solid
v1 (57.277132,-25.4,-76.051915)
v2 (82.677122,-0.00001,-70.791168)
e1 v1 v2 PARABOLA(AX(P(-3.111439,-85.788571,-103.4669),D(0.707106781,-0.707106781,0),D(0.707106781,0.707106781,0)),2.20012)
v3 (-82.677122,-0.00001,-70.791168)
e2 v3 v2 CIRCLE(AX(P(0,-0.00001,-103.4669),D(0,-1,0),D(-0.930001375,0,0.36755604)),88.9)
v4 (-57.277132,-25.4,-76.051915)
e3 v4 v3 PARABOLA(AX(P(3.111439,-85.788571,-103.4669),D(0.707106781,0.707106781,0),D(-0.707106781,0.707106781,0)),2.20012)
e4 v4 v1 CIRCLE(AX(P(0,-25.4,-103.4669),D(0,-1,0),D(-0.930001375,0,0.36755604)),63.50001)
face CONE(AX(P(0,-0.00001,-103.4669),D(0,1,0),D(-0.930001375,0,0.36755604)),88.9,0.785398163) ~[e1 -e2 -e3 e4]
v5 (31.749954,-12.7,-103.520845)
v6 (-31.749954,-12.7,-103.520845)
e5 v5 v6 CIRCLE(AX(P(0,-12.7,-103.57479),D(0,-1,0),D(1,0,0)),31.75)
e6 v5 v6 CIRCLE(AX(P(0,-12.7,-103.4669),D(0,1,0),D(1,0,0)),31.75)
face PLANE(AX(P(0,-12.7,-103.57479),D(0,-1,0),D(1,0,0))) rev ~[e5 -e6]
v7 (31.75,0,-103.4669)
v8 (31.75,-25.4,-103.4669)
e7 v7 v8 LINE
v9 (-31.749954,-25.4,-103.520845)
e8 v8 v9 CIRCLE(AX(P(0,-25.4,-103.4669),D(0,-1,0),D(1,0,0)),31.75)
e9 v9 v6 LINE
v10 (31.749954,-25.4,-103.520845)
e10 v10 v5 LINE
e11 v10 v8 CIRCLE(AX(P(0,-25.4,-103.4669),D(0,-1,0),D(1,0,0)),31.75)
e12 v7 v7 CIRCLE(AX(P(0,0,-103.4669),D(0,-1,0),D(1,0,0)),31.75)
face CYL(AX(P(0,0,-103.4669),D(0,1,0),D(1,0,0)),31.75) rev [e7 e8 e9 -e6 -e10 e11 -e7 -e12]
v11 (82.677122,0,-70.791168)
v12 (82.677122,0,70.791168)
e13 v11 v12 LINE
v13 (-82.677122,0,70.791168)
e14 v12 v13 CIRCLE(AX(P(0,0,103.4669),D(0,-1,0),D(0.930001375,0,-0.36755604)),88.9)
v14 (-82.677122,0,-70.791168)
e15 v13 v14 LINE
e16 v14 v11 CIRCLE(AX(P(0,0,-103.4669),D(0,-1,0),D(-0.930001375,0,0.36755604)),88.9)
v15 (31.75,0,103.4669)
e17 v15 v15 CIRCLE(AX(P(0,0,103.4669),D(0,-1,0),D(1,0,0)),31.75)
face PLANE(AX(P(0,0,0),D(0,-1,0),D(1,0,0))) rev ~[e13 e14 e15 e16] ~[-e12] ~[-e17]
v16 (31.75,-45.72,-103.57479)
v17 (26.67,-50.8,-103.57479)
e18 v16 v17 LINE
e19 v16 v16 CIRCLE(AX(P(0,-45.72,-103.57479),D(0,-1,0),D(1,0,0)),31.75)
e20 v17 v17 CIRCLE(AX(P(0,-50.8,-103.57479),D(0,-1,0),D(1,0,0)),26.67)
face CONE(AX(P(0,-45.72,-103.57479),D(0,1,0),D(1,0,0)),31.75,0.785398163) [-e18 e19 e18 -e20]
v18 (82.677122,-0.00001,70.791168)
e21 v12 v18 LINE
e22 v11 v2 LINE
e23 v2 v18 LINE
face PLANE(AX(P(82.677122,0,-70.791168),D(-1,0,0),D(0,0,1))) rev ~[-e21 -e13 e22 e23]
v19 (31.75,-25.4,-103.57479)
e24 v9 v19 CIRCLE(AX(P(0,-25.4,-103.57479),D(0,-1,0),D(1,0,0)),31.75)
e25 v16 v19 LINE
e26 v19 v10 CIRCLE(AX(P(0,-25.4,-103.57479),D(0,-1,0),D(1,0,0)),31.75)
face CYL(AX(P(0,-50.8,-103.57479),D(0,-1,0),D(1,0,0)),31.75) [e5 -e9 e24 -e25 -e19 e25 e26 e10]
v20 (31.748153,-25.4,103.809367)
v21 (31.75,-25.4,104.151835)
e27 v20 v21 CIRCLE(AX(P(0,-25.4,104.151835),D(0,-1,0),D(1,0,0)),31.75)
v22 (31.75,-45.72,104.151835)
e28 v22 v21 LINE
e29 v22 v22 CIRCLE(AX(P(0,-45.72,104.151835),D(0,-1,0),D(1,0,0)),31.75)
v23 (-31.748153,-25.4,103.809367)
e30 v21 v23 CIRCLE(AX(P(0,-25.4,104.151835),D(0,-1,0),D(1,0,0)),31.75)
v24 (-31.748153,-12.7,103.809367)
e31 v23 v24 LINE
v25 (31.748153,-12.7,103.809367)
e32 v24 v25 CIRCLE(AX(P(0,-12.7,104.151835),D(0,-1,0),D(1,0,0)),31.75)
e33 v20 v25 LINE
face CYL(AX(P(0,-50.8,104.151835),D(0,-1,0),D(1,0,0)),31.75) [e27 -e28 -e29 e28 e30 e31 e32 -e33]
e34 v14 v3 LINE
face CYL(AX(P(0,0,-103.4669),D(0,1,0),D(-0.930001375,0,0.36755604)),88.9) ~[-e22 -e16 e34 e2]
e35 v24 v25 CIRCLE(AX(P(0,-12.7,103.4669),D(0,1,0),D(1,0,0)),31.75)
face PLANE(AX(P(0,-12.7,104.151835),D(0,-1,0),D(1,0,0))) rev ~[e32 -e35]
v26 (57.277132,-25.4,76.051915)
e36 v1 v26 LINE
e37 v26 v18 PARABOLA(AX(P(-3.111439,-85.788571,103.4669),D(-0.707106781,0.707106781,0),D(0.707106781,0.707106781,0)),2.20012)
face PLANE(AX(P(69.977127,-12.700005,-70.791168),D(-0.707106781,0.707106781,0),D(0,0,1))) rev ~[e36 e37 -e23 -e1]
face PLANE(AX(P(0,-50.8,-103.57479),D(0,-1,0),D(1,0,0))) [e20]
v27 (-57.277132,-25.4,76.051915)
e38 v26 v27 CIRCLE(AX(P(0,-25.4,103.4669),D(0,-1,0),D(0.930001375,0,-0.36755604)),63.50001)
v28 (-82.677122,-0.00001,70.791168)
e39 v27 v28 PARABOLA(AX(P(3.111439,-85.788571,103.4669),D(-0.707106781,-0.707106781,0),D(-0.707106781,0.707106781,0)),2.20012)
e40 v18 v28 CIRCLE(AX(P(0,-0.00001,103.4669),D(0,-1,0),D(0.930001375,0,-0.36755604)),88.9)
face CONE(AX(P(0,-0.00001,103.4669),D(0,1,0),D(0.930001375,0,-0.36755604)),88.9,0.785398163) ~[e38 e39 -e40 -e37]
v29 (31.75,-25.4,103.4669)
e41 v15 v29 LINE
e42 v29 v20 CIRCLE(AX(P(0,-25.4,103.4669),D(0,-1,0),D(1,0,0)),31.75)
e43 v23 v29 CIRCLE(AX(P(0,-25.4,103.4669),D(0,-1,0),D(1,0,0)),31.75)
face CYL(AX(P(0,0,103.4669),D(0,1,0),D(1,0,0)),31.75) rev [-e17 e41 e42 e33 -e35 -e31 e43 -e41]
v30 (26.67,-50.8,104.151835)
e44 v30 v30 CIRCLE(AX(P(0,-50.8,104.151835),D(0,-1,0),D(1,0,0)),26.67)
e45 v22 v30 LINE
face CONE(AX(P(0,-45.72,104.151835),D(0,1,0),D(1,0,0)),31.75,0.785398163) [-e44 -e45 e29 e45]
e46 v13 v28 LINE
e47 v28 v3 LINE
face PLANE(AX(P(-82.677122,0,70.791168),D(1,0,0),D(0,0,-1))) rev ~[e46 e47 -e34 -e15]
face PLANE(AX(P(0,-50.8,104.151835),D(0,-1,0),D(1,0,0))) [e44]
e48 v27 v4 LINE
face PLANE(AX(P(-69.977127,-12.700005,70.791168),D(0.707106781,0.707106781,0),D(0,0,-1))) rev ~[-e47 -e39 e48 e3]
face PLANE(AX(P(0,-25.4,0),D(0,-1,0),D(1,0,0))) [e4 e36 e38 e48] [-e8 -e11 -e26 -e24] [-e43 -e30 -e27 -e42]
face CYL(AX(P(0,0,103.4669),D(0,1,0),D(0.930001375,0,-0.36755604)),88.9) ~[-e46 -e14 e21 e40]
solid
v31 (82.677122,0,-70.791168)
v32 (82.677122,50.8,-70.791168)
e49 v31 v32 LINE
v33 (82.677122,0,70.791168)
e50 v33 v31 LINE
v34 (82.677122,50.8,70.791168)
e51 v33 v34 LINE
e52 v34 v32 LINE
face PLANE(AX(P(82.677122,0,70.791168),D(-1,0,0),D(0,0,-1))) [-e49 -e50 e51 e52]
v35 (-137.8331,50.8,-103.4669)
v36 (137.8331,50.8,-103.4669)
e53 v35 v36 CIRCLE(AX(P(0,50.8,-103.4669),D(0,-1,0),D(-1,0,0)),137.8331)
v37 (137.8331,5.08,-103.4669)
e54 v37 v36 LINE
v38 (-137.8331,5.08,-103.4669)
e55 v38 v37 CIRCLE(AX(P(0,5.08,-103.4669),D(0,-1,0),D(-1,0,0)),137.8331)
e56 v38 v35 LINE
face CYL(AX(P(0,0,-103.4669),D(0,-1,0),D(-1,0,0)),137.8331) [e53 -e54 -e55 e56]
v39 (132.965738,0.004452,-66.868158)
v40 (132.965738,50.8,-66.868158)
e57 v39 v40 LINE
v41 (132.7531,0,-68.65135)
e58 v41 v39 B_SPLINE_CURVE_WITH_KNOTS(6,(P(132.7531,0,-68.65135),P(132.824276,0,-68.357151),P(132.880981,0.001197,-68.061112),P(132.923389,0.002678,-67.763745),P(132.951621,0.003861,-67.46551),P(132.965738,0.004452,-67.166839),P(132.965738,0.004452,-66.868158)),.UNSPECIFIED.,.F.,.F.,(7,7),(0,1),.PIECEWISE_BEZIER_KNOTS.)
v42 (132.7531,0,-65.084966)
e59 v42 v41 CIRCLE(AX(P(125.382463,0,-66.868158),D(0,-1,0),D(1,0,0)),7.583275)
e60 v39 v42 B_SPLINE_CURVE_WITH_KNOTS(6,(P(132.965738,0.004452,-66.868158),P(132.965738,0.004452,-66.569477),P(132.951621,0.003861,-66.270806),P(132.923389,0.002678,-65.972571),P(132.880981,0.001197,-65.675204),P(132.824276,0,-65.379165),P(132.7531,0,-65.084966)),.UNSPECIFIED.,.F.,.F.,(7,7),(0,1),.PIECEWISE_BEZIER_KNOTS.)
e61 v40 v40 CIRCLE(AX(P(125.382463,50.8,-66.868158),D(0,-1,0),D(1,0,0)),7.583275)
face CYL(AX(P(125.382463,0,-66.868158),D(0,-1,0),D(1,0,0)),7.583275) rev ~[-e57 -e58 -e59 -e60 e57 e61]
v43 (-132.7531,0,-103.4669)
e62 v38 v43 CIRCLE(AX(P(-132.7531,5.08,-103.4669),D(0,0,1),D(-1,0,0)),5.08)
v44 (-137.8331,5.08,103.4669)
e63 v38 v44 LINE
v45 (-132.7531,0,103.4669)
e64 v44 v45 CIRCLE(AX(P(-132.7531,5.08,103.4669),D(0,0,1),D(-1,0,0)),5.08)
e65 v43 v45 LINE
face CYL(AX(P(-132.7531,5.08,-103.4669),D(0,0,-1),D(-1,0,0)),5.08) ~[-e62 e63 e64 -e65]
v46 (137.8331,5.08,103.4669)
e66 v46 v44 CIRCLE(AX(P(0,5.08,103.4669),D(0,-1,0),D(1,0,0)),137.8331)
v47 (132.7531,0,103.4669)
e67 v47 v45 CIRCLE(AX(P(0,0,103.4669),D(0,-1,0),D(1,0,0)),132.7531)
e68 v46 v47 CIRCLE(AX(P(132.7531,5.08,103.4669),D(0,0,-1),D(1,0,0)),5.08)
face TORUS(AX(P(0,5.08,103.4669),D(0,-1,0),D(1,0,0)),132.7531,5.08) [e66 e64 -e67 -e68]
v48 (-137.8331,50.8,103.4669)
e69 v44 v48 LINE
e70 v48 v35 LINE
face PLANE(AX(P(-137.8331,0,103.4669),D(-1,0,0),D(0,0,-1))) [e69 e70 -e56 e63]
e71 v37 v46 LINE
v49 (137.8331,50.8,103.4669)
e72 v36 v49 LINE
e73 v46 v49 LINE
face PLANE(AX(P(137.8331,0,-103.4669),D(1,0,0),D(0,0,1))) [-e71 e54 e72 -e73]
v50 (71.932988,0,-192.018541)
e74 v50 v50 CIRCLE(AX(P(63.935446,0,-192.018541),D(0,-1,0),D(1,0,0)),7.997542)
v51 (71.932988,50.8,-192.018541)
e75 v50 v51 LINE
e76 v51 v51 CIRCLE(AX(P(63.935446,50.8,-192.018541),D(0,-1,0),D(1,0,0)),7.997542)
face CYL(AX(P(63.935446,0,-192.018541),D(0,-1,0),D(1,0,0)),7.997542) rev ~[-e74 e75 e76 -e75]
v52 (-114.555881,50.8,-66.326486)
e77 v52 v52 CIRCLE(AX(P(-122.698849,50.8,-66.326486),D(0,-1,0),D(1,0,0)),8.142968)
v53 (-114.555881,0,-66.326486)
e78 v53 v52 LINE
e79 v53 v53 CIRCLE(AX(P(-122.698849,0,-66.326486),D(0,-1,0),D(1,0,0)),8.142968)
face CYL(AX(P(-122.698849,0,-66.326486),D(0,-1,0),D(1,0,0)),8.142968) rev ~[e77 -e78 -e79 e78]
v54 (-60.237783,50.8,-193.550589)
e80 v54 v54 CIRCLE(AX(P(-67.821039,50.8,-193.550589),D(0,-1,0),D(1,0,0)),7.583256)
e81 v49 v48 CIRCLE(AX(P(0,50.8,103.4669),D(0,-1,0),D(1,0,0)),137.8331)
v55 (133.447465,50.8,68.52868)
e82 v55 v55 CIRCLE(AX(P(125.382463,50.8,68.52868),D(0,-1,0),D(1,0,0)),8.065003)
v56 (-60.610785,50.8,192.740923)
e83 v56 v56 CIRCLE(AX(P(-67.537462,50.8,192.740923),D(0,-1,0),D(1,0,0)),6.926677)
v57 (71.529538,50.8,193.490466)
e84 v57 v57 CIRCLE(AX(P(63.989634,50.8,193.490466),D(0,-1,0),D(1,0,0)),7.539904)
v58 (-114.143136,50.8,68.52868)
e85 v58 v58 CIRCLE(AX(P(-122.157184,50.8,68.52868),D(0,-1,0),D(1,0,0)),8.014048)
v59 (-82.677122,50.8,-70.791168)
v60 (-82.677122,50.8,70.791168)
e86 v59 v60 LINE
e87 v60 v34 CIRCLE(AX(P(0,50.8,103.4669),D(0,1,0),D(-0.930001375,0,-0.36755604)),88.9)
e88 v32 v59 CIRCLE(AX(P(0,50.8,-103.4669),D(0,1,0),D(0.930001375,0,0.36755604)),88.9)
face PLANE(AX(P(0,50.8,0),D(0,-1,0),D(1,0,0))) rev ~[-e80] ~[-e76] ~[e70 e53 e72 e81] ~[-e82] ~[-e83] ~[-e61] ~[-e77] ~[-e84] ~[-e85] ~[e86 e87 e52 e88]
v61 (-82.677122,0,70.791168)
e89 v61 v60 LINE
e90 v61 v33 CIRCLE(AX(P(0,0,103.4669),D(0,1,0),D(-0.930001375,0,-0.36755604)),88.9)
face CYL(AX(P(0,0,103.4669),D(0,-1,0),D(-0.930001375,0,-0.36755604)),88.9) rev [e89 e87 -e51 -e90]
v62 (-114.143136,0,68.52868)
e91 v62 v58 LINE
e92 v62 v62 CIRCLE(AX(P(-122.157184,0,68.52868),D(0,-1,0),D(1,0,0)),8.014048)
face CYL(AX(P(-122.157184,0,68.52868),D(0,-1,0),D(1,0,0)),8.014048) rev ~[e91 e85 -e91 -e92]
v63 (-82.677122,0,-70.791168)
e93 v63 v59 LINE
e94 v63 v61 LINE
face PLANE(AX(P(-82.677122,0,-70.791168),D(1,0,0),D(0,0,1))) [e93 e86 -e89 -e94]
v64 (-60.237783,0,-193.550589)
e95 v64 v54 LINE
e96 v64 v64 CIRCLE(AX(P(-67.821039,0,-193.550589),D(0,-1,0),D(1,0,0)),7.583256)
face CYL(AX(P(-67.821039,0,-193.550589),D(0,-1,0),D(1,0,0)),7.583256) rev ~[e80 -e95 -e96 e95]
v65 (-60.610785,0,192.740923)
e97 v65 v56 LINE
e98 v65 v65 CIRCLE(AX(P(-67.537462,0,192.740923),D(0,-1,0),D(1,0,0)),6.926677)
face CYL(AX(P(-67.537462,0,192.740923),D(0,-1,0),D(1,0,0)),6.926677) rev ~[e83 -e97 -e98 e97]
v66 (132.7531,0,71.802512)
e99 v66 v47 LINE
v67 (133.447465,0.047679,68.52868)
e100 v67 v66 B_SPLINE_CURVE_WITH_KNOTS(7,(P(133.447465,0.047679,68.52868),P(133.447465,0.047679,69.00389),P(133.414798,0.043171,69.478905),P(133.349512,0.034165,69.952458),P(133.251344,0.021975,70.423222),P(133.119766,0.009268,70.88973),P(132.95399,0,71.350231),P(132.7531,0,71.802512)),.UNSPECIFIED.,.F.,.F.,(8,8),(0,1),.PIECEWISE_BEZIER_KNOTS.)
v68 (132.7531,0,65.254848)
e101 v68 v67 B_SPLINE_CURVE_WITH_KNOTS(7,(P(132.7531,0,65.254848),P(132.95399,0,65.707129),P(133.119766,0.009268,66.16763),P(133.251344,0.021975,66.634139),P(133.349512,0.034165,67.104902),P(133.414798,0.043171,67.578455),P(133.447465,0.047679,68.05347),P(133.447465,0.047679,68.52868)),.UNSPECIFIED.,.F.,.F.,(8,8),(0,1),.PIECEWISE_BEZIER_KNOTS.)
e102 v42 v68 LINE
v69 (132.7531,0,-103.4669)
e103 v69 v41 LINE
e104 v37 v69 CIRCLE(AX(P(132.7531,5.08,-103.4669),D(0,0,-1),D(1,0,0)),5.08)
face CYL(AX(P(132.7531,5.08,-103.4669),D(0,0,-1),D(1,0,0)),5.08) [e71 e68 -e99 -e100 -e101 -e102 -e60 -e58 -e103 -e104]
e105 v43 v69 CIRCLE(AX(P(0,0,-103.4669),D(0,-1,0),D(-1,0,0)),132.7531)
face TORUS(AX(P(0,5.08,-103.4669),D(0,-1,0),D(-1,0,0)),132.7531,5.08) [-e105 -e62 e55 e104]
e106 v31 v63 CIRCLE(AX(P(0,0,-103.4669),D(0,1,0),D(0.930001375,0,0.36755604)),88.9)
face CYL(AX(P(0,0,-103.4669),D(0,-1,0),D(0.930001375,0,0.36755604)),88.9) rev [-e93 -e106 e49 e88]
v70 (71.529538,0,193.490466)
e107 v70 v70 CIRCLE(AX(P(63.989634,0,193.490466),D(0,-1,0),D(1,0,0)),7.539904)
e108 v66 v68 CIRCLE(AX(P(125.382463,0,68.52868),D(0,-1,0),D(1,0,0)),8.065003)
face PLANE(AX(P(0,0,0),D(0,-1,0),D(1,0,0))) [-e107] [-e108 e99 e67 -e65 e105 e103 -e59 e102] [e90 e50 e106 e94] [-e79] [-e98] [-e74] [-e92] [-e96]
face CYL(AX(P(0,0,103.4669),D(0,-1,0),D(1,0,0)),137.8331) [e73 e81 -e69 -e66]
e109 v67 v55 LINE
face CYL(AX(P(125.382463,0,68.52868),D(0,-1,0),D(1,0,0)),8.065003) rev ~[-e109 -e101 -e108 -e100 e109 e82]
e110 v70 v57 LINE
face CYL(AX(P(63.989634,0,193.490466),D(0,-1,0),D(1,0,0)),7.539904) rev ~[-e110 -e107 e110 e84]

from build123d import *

# Parameters (mm, degrees)
F0_R        = 7.5832559133
F0_R_2      = 8.1429677051
F0_R_3      = 7.9975424125
F0_R_4      = 7.5832754374
F0_R_5      = 8.0140482533
F0_R_6      = 6.9266770474
F0_R_7      = 8.0650025084
F0_R_8      = 7.5399035307
F1_DEPTH    = 50.8
F0_R_9      = 38.1
F0_R_10     = 31.75
F2_DEPTH    = 25.4
F4_R        = 31.75
F5_DEPTH    = 38.1
F6_SIZE     = 5.08
F7_T1_DEPTH = 206.9338
F7_T4_ANGLE = 180
F7_T6_ANGLE = 180
F8_SIZE     = 25.39999


# Not quite as in the source:
# - a fillet or chamfer that OpenCascade refuses, or shapes differently, is made with other operations: its cross-section is extruded or revolved along the edge and cut away or added
# - a fillet or chamfer is up to 0.001 mm smaller than in the source, because OpenCascade refuses the exact size


with BuildPart() as f1:
    # F0 (on Front) → F1 (new body)
    with BuildSketch(Plane.XZ):
        with BuildLine():
            Line((137.8331, -103.4669), (137.8331, 103.4669))
            ThreePointArc((137.8331, 103.4669), (0, 241.3), (-137.8331, 103.4669))
            Line((-137.8331, 103.4669), (-137.8331, -103.4669))
            ThreePointArc((-137.8331, -103.4669), (0, -241.3), (137.8331, -103.4669))
        make_face()
        with Locations((-67.8210385144, -193.5505885762)):
            Circle(F0_R, mode=Mode.SUBTRACT)
        with Locations((-122.6988486946, -66.3264859599)):
            Circle(F0_R_2, mode=Mode.SUBTRACT)
        with Locations((63.9354459941, -192.0185405892)):
            Circle(F0_R_3, mode=Mode.SUBTRACT)
        with Locations((125.382462889, -66.8681580704)):
            Circle(F0_R_4, mode=Mode.SUBTRACT)
        with Locations((-122.1571840346, 68.5286801177)):
            Circle(F0_R_5, mode=Mode.SUBTRACT)
        with Locations((-67.5374619663, 192.7409227806)):
            Circle(F0_R_6, mode=Mode.SUBTRACT)
        with BuildLine():
            ThreePointArc((-82.6771222469, 70.7911680728), (0, 192.3669), (82.6771222469, 70.7911680728))
            Line((82.6771222469, 70.7911680728), (82.6771222469, -70.7911680728))
            ThreePointArc((82.6771222469, -70.7911680728), (0, -192.3669), (-82.6771222469, -70.7911680728))
            Line((-82.6771222469, -70.7911680728), (-82.6771222469, 70.7911680728))
        make_face(mode=Mode.SUBTRACT)
        with Locations((125.382462889, 68.5286801177)):
            Circle(F0_R_7, mode=Mode.SUBTRACT)
        with Locations((63.9896340668, 193.4904660898)):
            Circle(F0_R_8, mode=Mode.SUBTRACT)
    extrude(amount=-F1_DEPTH)

    # F7: fillet of radius 5.08 on 4 edges, made by hand

    # F7_s2 → F7_t1 (cut)
    with BuildSketch(Plane.XY.offset(-103.4669)):
        with BuildLine():
            ThreePointArc((137.8331, 5.08), (136.3452024484, 1.4878975516), (132.7531, 0))
            Line((132.7531, 0), (137.8331, 0))
            Line((137.8331, 0), (137.8331, 5.08))
        make_face()
        with BuildLine():
            ThreePointArc((-137.8331, 5.08), (-136.3452024484, 1.4878975516), (-132.7531, 0))
            Line((-132.7531, 0), (-137.8331, 0))
            Line((-137.8331, 0), (-137.8331, 5.08))
        make_face()
    extrude(amount=F7_T1_DEPTH, mode=Mode.SUBTRACT)

    # F7_s3 → F7_t4 (revolve, cut)
    with BuildSketch(Plane.XY.offset(103.4669)):
        with BuildLine():
            ThreePointArc((137.8331, 5.08), (136.3452024484, 1.4878975516), (132.7531, 0))
            Line((132.7531, 0), (137.8331, 0))
            Line((137.8331, 0), (137.8331, 5.08))
        make_face()
    revolve(axis=Axis((0, 0, 103.4669), (0, -1, 0)), revolution_arc=F7_T4_ANGLE, mode=Mode.SUBTRACT)

    # F7_s5 → F7_t6 (revolve, cut)
    with BuildSketch(Plane.XY.offset(-103.4669)):
        with BuildLine():
            ThreePointArc((-137.8331, 5.08), (-136.3452024484, 1.4878975516), (-132.7531, 0))
            Line((-132.7531, 0), (-137.8331, 0))
            Line((-137.8331, 0), (-137.8331, 5.08))
        make_face()
    revolve(axis=Axis((0, 0, -103.4669), (0, -1, 0)), revolution_arc=F7_T6_ANGLE, mode=Mode.SUBTRACT)


with BuildPart() as f2:
    # F0 (on Front) → F2 (new body)
    with BuildSketch(Plane.XZ):
        with BuildLine():
            Line((82.6771222469, -70.7911680728), (82.6771222469, 70.7911680728))
            ThreePointArc((82.6771222469, 70.7911680728), (0, 192.3669), (-82.6771222469, 70.7911680728))
            Line((-82.6771222469, 70.7911680728), (-82.6771222469, -70.7911680728))
            ThreePointArc((-82.6771222469, -70.7911680728), (0, -192.3669), (82.6771222469, -70.7911680728))
        make_face()
        with Locations((0, -103.4669)):
            Circle(F0_R_9, mode=Mode.SUBTRACT)
        with Locations((0, 103.4669)):
            Circle(F0_R_9, mode=Mode.SUBTRACT)
        with Locations((0, 103.4669)):
            Circle(F0_R_9)
        with Locations((0, 103.4669)):
            Circle(F0_R_10, mode=Mode.SUBTRACT)
        with Locations((0, -103.4669)):
            Circle(F0_R_9)
        with Locations((0, -103.4669)):
            Circle(F0_R_10, mode=Mode.SUBTRACT)
    extrude(amount=F2_DEPTH)

    # F4 (on offset) → F5 (join)
    with BuildSketch(Plane.XZ.offset(50.8)):
        with Locations((0, 104.1518346508)):
            Circle(F4_R)
        with Locations((0, -103.5747896099)):
            Circle(F4_R)
    extrude(amount=-F5_DEPTH)

    # F6
    f6_edges = [f2.edges().sort_by_distance(p)[0] for p in [
        (-31.75, -50.8, 104.151835),
        (-31.75, -50.8, -103.57479),
    ]]
    chamfer(f6_edges, length=F6_SIZE)

    # F8 (size 25.4 in the source; OpenCascade refuses exactly that, so slightly less here)
    f8_edges = [f2.edges().sort_by_distance(p)[0] for p in [
        (0, -25.4, 192.3669),
        (82.677122, -25.4, 0),
        (-82.677122, -25.4, 0),
        (0, -25.4, -192.3669),
    ]]
    chamfer(f8_edges, length=F8_SIZE)


solid = Compound([f1.part, f2.part])
